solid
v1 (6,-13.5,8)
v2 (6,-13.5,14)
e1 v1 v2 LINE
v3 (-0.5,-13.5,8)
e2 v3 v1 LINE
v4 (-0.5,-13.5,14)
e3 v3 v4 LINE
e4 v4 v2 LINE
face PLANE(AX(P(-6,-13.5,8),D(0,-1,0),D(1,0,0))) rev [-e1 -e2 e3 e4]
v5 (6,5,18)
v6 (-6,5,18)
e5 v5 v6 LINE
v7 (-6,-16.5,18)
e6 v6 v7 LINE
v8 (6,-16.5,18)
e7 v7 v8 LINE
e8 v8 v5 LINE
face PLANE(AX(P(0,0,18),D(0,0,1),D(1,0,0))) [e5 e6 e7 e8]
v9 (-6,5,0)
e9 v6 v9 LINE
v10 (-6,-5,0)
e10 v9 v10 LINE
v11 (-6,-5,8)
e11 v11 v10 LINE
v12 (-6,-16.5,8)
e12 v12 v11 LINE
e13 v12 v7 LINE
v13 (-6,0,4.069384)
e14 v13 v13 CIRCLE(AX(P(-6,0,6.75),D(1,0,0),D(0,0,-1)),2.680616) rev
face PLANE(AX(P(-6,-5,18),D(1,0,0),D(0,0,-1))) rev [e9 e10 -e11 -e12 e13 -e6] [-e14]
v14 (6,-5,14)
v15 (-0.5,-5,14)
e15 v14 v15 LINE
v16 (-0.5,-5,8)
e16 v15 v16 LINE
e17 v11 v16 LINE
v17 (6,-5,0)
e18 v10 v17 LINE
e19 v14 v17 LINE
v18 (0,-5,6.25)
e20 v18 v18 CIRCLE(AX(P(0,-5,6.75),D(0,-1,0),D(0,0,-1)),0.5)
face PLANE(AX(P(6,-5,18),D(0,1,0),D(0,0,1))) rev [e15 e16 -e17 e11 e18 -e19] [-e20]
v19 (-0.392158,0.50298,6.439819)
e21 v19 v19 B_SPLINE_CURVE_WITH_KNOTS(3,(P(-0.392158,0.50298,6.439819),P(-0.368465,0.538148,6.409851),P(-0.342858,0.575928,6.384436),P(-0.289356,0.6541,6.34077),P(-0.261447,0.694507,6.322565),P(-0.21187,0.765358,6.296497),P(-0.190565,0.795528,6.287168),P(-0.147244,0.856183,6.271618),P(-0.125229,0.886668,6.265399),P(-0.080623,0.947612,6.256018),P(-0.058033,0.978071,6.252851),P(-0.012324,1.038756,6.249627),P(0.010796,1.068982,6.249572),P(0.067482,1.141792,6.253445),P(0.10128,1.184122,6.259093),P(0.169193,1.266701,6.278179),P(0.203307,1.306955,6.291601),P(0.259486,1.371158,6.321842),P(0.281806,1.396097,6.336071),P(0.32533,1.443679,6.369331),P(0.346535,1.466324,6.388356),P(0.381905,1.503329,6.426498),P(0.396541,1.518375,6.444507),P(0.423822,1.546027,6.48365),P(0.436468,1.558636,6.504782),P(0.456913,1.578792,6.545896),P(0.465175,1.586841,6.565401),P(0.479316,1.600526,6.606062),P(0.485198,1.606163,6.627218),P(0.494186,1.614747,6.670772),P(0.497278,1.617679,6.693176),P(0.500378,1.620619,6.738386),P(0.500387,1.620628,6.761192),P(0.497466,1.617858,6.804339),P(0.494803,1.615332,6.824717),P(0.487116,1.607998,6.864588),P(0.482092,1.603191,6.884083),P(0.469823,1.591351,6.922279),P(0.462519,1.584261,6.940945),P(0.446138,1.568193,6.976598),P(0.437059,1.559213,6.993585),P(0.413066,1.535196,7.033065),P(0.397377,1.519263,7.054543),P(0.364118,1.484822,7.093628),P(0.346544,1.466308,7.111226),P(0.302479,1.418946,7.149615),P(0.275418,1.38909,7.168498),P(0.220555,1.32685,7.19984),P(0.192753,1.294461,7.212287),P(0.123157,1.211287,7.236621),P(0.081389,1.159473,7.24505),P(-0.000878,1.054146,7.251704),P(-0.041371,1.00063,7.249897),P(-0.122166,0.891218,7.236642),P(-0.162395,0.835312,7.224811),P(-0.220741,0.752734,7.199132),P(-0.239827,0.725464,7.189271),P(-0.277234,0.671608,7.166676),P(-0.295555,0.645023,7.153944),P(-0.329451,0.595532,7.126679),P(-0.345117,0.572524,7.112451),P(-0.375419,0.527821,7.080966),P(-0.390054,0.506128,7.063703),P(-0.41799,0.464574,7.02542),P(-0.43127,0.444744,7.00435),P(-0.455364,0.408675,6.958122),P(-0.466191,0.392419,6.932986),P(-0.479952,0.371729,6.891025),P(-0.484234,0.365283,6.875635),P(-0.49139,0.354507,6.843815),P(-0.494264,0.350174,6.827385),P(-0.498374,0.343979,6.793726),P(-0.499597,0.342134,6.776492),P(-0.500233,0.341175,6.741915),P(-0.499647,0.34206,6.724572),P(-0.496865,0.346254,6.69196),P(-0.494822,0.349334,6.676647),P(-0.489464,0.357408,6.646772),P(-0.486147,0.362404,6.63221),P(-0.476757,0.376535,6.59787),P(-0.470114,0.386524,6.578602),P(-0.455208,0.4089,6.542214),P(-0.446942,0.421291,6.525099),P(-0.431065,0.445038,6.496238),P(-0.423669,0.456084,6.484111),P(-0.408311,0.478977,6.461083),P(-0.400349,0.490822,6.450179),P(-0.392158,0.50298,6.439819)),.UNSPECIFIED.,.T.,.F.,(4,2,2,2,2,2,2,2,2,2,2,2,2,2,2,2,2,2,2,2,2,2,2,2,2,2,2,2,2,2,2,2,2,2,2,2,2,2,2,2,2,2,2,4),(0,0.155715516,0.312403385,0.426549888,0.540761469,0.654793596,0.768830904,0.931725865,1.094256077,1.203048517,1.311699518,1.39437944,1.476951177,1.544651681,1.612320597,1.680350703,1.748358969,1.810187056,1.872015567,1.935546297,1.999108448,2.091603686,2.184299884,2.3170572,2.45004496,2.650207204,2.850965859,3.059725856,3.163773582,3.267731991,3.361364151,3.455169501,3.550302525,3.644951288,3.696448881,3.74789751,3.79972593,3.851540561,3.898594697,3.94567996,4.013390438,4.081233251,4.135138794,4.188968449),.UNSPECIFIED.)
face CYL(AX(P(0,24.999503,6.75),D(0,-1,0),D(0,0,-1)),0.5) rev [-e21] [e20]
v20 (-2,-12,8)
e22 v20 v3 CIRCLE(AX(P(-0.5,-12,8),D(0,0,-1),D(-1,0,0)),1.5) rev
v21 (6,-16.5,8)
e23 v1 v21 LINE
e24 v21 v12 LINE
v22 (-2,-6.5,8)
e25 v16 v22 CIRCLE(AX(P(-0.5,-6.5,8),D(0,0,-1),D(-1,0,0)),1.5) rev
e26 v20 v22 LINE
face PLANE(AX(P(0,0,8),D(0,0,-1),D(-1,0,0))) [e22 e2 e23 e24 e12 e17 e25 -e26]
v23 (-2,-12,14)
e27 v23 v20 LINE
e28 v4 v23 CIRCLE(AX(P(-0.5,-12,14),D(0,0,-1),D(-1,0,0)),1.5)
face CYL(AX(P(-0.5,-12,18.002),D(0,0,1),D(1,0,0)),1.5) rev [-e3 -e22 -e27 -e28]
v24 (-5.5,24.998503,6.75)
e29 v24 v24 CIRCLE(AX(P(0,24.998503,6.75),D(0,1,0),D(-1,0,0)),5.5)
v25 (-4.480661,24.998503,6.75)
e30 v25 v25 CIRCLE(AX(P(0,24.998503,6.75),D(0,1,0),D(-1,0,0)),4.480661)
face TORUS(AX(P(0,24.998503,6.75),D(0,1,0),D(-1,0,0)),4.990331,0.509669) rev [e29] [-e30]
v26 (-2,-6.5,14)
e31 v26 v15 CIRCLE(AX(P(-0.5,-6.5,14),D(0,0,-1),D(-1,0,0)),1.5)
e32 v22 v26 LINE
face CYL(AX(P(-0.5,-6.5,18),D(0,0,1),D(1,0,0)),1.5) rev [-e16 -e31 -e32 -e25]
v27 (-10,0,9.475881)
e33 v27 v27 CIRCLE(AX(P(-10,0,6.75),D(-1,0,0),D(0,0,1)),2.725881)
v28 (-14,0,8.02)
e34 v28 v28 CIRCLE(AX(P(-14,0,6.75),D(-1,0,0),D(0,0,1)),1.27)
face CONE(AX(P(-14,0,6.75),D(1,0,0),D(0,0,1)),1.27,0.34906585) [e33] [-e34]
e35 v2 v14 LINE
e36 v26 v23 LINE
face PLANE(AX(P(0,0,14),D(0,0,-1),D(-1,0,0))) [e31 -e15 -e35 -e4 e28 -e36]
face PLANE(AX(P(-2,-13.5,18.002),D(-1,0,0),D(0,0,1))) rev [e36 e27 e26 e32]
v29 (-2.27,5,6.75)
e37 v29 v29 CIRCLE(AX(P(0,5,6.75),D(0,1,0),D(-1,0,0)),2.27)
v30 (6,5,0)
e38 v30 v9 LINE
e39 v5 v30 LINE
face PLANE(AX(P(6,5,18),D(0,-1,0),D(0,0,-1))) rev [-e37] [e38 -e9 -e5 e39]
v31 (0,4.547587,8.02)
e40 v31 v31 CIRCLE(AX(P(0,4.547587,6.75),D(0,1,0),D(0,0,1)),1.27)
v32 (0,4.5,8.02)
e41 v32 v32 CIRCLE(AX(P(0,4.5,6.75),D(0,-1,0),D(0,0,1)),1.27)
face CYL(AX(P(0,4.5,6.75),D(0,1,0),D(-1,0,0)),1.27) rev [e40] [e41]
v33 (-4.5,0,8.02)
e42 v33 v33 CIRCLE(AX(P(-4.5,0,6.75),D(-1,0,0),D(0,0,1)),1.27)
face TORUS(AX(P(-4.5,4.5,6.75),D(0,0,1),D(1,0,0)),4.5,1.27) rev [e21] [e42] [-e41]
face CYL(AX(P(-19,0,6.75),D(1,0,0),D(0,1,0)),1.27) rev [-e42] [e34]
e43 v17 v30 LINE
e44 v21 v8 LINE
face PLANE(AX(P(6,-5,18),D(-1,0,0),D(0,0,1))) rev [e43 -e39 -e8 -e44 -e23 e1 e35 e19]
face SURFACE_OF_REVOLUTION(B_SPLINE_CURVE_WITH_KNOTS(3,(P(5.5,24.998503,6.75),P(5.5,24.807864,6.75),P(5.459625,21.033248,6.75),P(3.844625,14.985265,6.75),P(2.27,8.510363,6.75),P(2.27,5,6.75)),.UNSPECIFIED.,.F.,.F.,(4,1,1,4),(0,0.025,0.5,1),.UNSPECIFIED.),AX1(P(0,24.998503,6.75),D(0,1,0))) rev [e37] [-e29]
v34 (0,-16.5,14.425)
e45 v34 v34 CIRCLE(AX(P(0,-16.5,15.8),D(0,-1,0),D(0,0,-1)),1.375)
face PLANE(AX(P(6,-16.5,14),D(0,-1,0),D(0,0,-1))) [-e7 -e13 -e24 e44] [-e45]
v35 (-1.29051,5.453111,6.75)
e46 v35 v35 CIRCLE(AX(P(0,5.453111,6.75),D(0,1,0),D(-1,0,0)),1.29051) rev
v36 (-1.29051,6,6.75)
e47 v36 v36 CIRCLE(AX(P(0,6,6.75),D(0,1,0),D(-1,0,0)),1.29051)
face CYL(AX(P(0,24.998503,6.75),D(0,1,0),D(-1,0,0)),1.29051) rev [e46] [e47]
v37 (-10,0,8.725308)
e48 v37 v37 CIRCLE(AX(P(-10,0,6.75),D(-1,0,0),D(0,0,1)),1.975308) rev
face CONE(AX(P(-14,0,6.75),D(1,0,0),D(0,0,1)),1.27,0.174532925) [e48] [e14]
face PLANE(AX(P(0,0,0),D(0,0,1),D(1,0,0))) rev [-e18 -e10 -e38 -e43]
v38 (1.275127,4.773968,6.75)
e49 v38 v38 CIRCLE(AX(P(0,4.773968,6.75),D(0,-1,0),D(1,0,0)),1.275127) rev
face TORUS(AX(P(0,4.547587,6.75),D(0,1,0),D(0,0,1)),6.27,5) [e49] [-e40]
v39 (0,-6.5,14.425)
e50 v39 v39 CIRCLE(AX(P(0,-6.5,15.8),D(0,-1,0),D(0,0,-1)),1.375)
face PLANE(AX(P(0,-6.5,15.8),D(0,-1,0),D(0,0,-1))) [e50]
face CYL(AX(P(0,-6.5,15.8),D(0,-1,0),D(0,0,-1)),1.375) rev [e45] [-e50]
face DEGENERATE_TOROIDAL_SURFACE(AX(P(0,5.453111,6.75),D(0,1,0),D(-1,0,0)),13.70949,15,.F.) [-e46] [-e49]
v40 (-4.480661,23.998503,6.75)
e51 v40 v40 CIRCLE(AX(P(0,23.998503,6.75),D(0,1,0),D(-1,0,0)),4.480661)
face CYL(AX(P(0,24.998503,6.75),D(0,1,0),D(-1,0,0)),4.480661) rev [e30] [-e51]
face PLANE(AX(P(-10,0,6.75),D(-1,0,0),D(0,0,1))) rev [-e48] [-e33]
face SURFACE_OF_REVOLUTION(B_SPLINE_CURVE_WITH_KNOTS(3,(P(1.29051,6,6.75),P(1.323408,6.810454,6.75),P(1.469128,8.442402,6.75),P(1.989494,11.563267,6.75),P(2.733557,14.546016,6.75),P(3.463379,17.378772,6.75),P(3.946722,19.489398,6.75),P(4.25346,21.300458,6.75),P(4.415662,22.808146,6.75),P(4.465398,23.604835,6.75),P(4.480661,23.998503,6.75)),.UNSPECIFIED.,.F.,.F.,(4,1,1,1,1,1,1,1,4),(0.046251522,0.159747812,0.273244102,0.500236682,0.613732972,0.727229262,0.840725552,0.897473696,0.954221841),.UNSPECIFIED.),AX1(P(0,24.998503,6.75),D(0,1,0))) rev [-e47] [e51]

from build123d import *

# Parameters (mm, degrees)
SKETCH1_W                     = 12
SKETCH1_H                     = 10
BOSS_EXTRUDE1_DEPTH           = 18
SKETCH5_R                     = 1.27
BOSS_EXTRUDE2_DEPTH           = 8
BOSS_EXTRUDE2_DRAFT           = 10
SKETCH5_2_R                   = 1.27
BOSS_EXTRUDE3_DEPTH           = 4
BOSS_EXTRUDE3_DRAFT           = 20
SKETCH5_4_R                   = 1.27
FILLET2_R                     = 15
SKETCH7_W                     = 12
SKETCH7_H                     = 11.5
BOSS_EXTRUDE4_DEPTH           = 4
SKETCH8_W                     = 12
SKETCH8_H                     = 3
BOSS_EXTRUDE5_DEPTH           = 6
SKETCH9_R                     = 1.375
CUT_EXTRUDE1_DEPTH            = 10
CUT_EXTRUDE2_REACH            = 39.682
CUT_EXTRUDE2_END_MAJOR_RADIUS = 4.5
CUT_EXTRUDE2_END_MINOR_RADIUS = 1.27
SKETCH10_R                    = 0.5
BOSS_EXTRUDE6_REACH           = 32.347
SKETCH11_W                    = 4
SKETCH11_H                    = 8.5
FILLET3_R                     = 1.5


with BuildPart() as part:
    # Sketch1 → Boss-Extrude1 (new body)
    with BuildSketch(Plane.XY):
        Rectangle(SKETCH1_W, SKETCH1_H)
    extrude(amount=BOSS_EXTRUDE1_DEPTH)

    # Sketch3 → Revolve1 (revolve)
    with BuildSketch(Plane(origin=(0, 0, 6.75), x_dir=(-1, 0, 0), z_dir=(0, 0, -1)), mode=Mode.PRIVATE) as revolve1_sk:
        with BuildLine():
            Line((-1.290509857, 5), (-2.27, 5))
            add(Edge.make_bspline(
                [(-5.5, 24.998503325), (-5.5, 24.807864043), (-5.459624999, 21.033247585), (-3.844625, 14.985265119), (-2.27, 8.510363101), (-2.27, 5)],
                knots=[0, 0, 0, 0, 0.025, 0.5, 1, 1, 1, 1], degree=3))
            ThreePointArc((-5.5, 24.998503325), (-4.990330513, 24.488833838), (-4.480661026, 24.998503325))
            Line((-4.480661026, 24.998503325), (-4.480661026, 23.998503325))
            add(Edge.make_bspline(
                [(-4.480661026, 23.998503325), (-4.46539815, 23.604834887), (-4.415661996, 22.80814634), (-4.253459846, 21.300457939), (-3.946721612, 19.489397713), (-3.463378936, 17.378771912), (-2.733557395, 14.546016044), (-1.989493801, 11.563267181), (-1.469127638, 8.442402152), (-1.323407915, 6.810453777), (-1.290509857, 6)],
                knots=[0.046251522, 0.046251522, 0.046251522, 0.046251522, 0.102999667, 0.159747812, 0.273244102, 0.386740392, 0.500236682, 0.727229262, 0.840725552, 0.954221841, 0.954221841, 0.954221841, 0.954221841], degree=3))
            Line((-1.290509857, 6), (-1.290509857, 5))
        make_face()
    revolve(revolve1_sk.sketch.rotate(Axis((0, 24.998503325, 6.75), (0, -1, 0)), 180), axis=Axis((0, 24.998503325, 6.75), (0, -1, 0)))


with BuildPart() as boss_extrude2_tool:
    # Sketch5 → Boss-Extrude2 (with draft: the straight prism first)
    with BuildSketch(Plane.ZY.offset(14)):
        with Locations((6.75, 0)):
            Circle(SKETCH5_R)
    extrude(amount=-BOSS_EXTRUDE2_DEPTH)
    # Boss-Extrude2: the draft: its side faces are tilted about the plane it starts from
    boss_extrude2_sides = [boss_extrude2_tool.faces().sort_by_distance(p)[0] for p in [
        (-10, 0, 5.48),
    ]]
    draft(boss_extrude2_sides, Plane.ZY.offset(14), BOSS_EXTRUDE2_DRAFT)


with BuildPart() as part_1:
    add(part.part)

    # Boss-Extrude2: add boss_extrude2_tool
    add(boss_extrude2_tool.part)


with BuildPart() as boss_extrude3_tool:
    # Sketch5<2> → Boss-Extrude3 (with draft: the straight prism first)
    with BuildSketch(Plane.ZY.offset(14)):
        with Locations((6.75, 0)):
            Circle(SKETCH5_2_R)
    extrude(amount=-BOSS_EXTRUDE3_DEPTH)
    # Boss-Extrude3: the draft: its side faces are tilted about the plane it starts from
    boss_extrude3_sides = [boss_extrude3_tool.faces().sort_by_distance(p)[0] for p in [
        (-12, 0, 5.48),
    ]]
    draft(boss_extrude3_sides, Plane.ZY.offset(14), BOSS_EXTRUDE3_DRAFT)


with BuildPart() as part_2:
    add(part_1.part)

    # Boss-Extrude3: add boss_extrude3_tool
    add(boss_extrude3_tool.part)

    # Cut-Sweep1: sweep along a path in Sketch6
    with BuildLine(Plane(origin=(0, 0, 6.75), x_dir=(-1, 0, 0), z_dir=(0, 0, -1))) as cut_sweep1_path:
        Line((14, 0), (4.5, 0))
        ThreePointArc((4.5, 0), (1.318019485, 1.318019485), (0, 4.5))
        Line((0, 4.5), (0, 5))
    # Sketch5<4> → Cut-Sweep1 (sweep, cut)
    with BuildSketch(Plane.ZY.offset(14)):
        with Locations((6.75, 0)):
            Circle(SKETCH5_4_R)
    sweep(path=cut_sweep1_path.line, mode=Mode.SUBTRACT)

    # Fillet1: read off the stored shape, not the designer's step
    # Fillet1 outline → Fillet1 (revolve, cut)
    with BuildSketch(Plane.XY.offset(6.75)):
        with BuildLine():
            ThreePointArc((1.27, 4.547586565), (1.275130096, 4.774025613), (1.290509857, 5))
            Line((1.290509857, 5), (1.27, 5))
            Line((1.27, 5), (1.27, 4.547586565))
        make_face()
    revolve(axis=Axis((0, 0, 6.75), (0, 1, 0)), mode=Mode.SUBTRACT)

    # Fillet2
    # the kernel refuses this fillet: 15 mm, written as the material it adds along each edge
    with BuildSketch(Plane(origin=(0, 5, 6.75), x_dir=(-1, 0, 0), z_dir=(0, 0, 1))) as fillet2_piece_1:
        with BuildLine():
            CenterArc((-13.709490143, -0.453110518), FILLET2_R, 0, 2.595022157)
            ThreePointArc((1.275127464, 0.226032446), (1.281538275, 0.112929088), (1.290509857, 0))
            Line((1.290509857, 0), (1.290509857, -0.453110518))
        make_face()
    revolve(axis=Axis((0, 5, 6.75), (0, -1, 0)), revolution_arc=180)
    with BuildSketch(Plane(origin=(0, 5, 6.75), x_dir=(1, 0, 0), z_dir=(0, 0, -1))) as fillet2_piece_2:
        with BuildLine():
            CenterArc((-13.709490143, -0.453110518), FILLET2_R, 360, 2.595022157)
            ThreePointArc((1.275127464, 0.226032446), (1.281538275, 0.112929088), (1.290509857, 0))
            Line((1.290509857, 0), (1.290509857, -0.453110518))
        make_face()
    revolve(axis=Axis((0, 5, 6.75), (0, -1, 0)), revolution_arc=180)

    # Sketch7 → Boss-Extrude4 (add)
    with BuildSketch(Plane.XY.offset(18)):
        with Locations((0, -10.75)):
            Rectangle(SKETCH7_W, SKETCH7_H)
    extrude(amount=-BOSS_EXTRUDE4_DEPTH)

    # Sketch8 → Boss-Extrude5 (add)
    with BuildSketch(Plane(origin=(0, 0, 14), x_dir=(-1, 0, 0), z_dir=(0, 0, -1))):
        with Locations((0, -15)):
            Rectangle(SKETCH8_W, SKETCH8_H)
    extrude(amount=BOSS_EXTRUDE5_DEPTH)

    # Sketch9 → Cut-Extrude1 (cut)
    with BuildSketch(Plane.XZ.offset(16.5)):
        with Locations(Location((0, 15.8, 0), (0, 0, 270))):
            Circle(SKETCH9_R)
    extrude(amount=-CUT_EXTRUDE1_DEPTH, mode=Mode.SUBTRACT)

    # Cut-Extrude2: up to this torus (the profile starts outside it)
    cut_extrude2_end = Plane(origin=(-4.5, 4.5, 6.75), z_dir=(0, 0, 1)) * Torus(CUT_EXTRUDE2_END_MAJOR_RADIUS, CUT_EXTRUDE2_END_MINOR_RADIUS, mode=Mode.PRIVATE)
    # Sketch10 → Cut-Extrude2 (cut, up to the surface)
    with BuildSketch(Plane.XZ.offset(5), mode=Mode.PRIVATE) as cut_extrude2_sk1:
        with Locations(Location((0, 6.75, 0), (0, 0, 270))):
            Circle(SKETCH10_R)
    cut_extrude2_tool1 = extrude(cut_extrude2_sk1.sketch, amount=-CUT_EXTRUDE2_REACH, mode=Mode.PRIVATE) - cut_extrude2_end
    add(cut_extrude2_tool1.solids().sort_by_distance((0, -5, 6.75))[0], mode=Mode.SUBTRACT)

    # Sketch11 → Boss-Extrude6 (add, up to next)
    with BuildSketch(Plane(origin=(0, 0, 8), x_dir=(-1, 0, 0), z_dir=(0, 0, -1)), mode=Mode.PRIVATE) as boss_extrude6_sk1:
        with Locations((4, -9.25)):
            Rectangle(SKETCH11_W, SKETCH11_H)
    boss_extrude6_tool1 = extrude(boss_extrude6_sk1.sketch, amount=-BOSS_EXTRUDE6_REACH, mode=Mode.PRIVATE) - part_2.part
    add(boss_extrude6_tool1.solids().sort_by_distance((-4, -9.25, 8))[0])

    # Fillet3
    fillet3_edges = [part_2.edges().sort_by_distance(p)[0] for p in [
        (-2, -13.5, 11),
        (-2, -5, 11),
    ]]
    fillet(fillet3_edges, radius=FILLET3_R)


solid = part_2.part
